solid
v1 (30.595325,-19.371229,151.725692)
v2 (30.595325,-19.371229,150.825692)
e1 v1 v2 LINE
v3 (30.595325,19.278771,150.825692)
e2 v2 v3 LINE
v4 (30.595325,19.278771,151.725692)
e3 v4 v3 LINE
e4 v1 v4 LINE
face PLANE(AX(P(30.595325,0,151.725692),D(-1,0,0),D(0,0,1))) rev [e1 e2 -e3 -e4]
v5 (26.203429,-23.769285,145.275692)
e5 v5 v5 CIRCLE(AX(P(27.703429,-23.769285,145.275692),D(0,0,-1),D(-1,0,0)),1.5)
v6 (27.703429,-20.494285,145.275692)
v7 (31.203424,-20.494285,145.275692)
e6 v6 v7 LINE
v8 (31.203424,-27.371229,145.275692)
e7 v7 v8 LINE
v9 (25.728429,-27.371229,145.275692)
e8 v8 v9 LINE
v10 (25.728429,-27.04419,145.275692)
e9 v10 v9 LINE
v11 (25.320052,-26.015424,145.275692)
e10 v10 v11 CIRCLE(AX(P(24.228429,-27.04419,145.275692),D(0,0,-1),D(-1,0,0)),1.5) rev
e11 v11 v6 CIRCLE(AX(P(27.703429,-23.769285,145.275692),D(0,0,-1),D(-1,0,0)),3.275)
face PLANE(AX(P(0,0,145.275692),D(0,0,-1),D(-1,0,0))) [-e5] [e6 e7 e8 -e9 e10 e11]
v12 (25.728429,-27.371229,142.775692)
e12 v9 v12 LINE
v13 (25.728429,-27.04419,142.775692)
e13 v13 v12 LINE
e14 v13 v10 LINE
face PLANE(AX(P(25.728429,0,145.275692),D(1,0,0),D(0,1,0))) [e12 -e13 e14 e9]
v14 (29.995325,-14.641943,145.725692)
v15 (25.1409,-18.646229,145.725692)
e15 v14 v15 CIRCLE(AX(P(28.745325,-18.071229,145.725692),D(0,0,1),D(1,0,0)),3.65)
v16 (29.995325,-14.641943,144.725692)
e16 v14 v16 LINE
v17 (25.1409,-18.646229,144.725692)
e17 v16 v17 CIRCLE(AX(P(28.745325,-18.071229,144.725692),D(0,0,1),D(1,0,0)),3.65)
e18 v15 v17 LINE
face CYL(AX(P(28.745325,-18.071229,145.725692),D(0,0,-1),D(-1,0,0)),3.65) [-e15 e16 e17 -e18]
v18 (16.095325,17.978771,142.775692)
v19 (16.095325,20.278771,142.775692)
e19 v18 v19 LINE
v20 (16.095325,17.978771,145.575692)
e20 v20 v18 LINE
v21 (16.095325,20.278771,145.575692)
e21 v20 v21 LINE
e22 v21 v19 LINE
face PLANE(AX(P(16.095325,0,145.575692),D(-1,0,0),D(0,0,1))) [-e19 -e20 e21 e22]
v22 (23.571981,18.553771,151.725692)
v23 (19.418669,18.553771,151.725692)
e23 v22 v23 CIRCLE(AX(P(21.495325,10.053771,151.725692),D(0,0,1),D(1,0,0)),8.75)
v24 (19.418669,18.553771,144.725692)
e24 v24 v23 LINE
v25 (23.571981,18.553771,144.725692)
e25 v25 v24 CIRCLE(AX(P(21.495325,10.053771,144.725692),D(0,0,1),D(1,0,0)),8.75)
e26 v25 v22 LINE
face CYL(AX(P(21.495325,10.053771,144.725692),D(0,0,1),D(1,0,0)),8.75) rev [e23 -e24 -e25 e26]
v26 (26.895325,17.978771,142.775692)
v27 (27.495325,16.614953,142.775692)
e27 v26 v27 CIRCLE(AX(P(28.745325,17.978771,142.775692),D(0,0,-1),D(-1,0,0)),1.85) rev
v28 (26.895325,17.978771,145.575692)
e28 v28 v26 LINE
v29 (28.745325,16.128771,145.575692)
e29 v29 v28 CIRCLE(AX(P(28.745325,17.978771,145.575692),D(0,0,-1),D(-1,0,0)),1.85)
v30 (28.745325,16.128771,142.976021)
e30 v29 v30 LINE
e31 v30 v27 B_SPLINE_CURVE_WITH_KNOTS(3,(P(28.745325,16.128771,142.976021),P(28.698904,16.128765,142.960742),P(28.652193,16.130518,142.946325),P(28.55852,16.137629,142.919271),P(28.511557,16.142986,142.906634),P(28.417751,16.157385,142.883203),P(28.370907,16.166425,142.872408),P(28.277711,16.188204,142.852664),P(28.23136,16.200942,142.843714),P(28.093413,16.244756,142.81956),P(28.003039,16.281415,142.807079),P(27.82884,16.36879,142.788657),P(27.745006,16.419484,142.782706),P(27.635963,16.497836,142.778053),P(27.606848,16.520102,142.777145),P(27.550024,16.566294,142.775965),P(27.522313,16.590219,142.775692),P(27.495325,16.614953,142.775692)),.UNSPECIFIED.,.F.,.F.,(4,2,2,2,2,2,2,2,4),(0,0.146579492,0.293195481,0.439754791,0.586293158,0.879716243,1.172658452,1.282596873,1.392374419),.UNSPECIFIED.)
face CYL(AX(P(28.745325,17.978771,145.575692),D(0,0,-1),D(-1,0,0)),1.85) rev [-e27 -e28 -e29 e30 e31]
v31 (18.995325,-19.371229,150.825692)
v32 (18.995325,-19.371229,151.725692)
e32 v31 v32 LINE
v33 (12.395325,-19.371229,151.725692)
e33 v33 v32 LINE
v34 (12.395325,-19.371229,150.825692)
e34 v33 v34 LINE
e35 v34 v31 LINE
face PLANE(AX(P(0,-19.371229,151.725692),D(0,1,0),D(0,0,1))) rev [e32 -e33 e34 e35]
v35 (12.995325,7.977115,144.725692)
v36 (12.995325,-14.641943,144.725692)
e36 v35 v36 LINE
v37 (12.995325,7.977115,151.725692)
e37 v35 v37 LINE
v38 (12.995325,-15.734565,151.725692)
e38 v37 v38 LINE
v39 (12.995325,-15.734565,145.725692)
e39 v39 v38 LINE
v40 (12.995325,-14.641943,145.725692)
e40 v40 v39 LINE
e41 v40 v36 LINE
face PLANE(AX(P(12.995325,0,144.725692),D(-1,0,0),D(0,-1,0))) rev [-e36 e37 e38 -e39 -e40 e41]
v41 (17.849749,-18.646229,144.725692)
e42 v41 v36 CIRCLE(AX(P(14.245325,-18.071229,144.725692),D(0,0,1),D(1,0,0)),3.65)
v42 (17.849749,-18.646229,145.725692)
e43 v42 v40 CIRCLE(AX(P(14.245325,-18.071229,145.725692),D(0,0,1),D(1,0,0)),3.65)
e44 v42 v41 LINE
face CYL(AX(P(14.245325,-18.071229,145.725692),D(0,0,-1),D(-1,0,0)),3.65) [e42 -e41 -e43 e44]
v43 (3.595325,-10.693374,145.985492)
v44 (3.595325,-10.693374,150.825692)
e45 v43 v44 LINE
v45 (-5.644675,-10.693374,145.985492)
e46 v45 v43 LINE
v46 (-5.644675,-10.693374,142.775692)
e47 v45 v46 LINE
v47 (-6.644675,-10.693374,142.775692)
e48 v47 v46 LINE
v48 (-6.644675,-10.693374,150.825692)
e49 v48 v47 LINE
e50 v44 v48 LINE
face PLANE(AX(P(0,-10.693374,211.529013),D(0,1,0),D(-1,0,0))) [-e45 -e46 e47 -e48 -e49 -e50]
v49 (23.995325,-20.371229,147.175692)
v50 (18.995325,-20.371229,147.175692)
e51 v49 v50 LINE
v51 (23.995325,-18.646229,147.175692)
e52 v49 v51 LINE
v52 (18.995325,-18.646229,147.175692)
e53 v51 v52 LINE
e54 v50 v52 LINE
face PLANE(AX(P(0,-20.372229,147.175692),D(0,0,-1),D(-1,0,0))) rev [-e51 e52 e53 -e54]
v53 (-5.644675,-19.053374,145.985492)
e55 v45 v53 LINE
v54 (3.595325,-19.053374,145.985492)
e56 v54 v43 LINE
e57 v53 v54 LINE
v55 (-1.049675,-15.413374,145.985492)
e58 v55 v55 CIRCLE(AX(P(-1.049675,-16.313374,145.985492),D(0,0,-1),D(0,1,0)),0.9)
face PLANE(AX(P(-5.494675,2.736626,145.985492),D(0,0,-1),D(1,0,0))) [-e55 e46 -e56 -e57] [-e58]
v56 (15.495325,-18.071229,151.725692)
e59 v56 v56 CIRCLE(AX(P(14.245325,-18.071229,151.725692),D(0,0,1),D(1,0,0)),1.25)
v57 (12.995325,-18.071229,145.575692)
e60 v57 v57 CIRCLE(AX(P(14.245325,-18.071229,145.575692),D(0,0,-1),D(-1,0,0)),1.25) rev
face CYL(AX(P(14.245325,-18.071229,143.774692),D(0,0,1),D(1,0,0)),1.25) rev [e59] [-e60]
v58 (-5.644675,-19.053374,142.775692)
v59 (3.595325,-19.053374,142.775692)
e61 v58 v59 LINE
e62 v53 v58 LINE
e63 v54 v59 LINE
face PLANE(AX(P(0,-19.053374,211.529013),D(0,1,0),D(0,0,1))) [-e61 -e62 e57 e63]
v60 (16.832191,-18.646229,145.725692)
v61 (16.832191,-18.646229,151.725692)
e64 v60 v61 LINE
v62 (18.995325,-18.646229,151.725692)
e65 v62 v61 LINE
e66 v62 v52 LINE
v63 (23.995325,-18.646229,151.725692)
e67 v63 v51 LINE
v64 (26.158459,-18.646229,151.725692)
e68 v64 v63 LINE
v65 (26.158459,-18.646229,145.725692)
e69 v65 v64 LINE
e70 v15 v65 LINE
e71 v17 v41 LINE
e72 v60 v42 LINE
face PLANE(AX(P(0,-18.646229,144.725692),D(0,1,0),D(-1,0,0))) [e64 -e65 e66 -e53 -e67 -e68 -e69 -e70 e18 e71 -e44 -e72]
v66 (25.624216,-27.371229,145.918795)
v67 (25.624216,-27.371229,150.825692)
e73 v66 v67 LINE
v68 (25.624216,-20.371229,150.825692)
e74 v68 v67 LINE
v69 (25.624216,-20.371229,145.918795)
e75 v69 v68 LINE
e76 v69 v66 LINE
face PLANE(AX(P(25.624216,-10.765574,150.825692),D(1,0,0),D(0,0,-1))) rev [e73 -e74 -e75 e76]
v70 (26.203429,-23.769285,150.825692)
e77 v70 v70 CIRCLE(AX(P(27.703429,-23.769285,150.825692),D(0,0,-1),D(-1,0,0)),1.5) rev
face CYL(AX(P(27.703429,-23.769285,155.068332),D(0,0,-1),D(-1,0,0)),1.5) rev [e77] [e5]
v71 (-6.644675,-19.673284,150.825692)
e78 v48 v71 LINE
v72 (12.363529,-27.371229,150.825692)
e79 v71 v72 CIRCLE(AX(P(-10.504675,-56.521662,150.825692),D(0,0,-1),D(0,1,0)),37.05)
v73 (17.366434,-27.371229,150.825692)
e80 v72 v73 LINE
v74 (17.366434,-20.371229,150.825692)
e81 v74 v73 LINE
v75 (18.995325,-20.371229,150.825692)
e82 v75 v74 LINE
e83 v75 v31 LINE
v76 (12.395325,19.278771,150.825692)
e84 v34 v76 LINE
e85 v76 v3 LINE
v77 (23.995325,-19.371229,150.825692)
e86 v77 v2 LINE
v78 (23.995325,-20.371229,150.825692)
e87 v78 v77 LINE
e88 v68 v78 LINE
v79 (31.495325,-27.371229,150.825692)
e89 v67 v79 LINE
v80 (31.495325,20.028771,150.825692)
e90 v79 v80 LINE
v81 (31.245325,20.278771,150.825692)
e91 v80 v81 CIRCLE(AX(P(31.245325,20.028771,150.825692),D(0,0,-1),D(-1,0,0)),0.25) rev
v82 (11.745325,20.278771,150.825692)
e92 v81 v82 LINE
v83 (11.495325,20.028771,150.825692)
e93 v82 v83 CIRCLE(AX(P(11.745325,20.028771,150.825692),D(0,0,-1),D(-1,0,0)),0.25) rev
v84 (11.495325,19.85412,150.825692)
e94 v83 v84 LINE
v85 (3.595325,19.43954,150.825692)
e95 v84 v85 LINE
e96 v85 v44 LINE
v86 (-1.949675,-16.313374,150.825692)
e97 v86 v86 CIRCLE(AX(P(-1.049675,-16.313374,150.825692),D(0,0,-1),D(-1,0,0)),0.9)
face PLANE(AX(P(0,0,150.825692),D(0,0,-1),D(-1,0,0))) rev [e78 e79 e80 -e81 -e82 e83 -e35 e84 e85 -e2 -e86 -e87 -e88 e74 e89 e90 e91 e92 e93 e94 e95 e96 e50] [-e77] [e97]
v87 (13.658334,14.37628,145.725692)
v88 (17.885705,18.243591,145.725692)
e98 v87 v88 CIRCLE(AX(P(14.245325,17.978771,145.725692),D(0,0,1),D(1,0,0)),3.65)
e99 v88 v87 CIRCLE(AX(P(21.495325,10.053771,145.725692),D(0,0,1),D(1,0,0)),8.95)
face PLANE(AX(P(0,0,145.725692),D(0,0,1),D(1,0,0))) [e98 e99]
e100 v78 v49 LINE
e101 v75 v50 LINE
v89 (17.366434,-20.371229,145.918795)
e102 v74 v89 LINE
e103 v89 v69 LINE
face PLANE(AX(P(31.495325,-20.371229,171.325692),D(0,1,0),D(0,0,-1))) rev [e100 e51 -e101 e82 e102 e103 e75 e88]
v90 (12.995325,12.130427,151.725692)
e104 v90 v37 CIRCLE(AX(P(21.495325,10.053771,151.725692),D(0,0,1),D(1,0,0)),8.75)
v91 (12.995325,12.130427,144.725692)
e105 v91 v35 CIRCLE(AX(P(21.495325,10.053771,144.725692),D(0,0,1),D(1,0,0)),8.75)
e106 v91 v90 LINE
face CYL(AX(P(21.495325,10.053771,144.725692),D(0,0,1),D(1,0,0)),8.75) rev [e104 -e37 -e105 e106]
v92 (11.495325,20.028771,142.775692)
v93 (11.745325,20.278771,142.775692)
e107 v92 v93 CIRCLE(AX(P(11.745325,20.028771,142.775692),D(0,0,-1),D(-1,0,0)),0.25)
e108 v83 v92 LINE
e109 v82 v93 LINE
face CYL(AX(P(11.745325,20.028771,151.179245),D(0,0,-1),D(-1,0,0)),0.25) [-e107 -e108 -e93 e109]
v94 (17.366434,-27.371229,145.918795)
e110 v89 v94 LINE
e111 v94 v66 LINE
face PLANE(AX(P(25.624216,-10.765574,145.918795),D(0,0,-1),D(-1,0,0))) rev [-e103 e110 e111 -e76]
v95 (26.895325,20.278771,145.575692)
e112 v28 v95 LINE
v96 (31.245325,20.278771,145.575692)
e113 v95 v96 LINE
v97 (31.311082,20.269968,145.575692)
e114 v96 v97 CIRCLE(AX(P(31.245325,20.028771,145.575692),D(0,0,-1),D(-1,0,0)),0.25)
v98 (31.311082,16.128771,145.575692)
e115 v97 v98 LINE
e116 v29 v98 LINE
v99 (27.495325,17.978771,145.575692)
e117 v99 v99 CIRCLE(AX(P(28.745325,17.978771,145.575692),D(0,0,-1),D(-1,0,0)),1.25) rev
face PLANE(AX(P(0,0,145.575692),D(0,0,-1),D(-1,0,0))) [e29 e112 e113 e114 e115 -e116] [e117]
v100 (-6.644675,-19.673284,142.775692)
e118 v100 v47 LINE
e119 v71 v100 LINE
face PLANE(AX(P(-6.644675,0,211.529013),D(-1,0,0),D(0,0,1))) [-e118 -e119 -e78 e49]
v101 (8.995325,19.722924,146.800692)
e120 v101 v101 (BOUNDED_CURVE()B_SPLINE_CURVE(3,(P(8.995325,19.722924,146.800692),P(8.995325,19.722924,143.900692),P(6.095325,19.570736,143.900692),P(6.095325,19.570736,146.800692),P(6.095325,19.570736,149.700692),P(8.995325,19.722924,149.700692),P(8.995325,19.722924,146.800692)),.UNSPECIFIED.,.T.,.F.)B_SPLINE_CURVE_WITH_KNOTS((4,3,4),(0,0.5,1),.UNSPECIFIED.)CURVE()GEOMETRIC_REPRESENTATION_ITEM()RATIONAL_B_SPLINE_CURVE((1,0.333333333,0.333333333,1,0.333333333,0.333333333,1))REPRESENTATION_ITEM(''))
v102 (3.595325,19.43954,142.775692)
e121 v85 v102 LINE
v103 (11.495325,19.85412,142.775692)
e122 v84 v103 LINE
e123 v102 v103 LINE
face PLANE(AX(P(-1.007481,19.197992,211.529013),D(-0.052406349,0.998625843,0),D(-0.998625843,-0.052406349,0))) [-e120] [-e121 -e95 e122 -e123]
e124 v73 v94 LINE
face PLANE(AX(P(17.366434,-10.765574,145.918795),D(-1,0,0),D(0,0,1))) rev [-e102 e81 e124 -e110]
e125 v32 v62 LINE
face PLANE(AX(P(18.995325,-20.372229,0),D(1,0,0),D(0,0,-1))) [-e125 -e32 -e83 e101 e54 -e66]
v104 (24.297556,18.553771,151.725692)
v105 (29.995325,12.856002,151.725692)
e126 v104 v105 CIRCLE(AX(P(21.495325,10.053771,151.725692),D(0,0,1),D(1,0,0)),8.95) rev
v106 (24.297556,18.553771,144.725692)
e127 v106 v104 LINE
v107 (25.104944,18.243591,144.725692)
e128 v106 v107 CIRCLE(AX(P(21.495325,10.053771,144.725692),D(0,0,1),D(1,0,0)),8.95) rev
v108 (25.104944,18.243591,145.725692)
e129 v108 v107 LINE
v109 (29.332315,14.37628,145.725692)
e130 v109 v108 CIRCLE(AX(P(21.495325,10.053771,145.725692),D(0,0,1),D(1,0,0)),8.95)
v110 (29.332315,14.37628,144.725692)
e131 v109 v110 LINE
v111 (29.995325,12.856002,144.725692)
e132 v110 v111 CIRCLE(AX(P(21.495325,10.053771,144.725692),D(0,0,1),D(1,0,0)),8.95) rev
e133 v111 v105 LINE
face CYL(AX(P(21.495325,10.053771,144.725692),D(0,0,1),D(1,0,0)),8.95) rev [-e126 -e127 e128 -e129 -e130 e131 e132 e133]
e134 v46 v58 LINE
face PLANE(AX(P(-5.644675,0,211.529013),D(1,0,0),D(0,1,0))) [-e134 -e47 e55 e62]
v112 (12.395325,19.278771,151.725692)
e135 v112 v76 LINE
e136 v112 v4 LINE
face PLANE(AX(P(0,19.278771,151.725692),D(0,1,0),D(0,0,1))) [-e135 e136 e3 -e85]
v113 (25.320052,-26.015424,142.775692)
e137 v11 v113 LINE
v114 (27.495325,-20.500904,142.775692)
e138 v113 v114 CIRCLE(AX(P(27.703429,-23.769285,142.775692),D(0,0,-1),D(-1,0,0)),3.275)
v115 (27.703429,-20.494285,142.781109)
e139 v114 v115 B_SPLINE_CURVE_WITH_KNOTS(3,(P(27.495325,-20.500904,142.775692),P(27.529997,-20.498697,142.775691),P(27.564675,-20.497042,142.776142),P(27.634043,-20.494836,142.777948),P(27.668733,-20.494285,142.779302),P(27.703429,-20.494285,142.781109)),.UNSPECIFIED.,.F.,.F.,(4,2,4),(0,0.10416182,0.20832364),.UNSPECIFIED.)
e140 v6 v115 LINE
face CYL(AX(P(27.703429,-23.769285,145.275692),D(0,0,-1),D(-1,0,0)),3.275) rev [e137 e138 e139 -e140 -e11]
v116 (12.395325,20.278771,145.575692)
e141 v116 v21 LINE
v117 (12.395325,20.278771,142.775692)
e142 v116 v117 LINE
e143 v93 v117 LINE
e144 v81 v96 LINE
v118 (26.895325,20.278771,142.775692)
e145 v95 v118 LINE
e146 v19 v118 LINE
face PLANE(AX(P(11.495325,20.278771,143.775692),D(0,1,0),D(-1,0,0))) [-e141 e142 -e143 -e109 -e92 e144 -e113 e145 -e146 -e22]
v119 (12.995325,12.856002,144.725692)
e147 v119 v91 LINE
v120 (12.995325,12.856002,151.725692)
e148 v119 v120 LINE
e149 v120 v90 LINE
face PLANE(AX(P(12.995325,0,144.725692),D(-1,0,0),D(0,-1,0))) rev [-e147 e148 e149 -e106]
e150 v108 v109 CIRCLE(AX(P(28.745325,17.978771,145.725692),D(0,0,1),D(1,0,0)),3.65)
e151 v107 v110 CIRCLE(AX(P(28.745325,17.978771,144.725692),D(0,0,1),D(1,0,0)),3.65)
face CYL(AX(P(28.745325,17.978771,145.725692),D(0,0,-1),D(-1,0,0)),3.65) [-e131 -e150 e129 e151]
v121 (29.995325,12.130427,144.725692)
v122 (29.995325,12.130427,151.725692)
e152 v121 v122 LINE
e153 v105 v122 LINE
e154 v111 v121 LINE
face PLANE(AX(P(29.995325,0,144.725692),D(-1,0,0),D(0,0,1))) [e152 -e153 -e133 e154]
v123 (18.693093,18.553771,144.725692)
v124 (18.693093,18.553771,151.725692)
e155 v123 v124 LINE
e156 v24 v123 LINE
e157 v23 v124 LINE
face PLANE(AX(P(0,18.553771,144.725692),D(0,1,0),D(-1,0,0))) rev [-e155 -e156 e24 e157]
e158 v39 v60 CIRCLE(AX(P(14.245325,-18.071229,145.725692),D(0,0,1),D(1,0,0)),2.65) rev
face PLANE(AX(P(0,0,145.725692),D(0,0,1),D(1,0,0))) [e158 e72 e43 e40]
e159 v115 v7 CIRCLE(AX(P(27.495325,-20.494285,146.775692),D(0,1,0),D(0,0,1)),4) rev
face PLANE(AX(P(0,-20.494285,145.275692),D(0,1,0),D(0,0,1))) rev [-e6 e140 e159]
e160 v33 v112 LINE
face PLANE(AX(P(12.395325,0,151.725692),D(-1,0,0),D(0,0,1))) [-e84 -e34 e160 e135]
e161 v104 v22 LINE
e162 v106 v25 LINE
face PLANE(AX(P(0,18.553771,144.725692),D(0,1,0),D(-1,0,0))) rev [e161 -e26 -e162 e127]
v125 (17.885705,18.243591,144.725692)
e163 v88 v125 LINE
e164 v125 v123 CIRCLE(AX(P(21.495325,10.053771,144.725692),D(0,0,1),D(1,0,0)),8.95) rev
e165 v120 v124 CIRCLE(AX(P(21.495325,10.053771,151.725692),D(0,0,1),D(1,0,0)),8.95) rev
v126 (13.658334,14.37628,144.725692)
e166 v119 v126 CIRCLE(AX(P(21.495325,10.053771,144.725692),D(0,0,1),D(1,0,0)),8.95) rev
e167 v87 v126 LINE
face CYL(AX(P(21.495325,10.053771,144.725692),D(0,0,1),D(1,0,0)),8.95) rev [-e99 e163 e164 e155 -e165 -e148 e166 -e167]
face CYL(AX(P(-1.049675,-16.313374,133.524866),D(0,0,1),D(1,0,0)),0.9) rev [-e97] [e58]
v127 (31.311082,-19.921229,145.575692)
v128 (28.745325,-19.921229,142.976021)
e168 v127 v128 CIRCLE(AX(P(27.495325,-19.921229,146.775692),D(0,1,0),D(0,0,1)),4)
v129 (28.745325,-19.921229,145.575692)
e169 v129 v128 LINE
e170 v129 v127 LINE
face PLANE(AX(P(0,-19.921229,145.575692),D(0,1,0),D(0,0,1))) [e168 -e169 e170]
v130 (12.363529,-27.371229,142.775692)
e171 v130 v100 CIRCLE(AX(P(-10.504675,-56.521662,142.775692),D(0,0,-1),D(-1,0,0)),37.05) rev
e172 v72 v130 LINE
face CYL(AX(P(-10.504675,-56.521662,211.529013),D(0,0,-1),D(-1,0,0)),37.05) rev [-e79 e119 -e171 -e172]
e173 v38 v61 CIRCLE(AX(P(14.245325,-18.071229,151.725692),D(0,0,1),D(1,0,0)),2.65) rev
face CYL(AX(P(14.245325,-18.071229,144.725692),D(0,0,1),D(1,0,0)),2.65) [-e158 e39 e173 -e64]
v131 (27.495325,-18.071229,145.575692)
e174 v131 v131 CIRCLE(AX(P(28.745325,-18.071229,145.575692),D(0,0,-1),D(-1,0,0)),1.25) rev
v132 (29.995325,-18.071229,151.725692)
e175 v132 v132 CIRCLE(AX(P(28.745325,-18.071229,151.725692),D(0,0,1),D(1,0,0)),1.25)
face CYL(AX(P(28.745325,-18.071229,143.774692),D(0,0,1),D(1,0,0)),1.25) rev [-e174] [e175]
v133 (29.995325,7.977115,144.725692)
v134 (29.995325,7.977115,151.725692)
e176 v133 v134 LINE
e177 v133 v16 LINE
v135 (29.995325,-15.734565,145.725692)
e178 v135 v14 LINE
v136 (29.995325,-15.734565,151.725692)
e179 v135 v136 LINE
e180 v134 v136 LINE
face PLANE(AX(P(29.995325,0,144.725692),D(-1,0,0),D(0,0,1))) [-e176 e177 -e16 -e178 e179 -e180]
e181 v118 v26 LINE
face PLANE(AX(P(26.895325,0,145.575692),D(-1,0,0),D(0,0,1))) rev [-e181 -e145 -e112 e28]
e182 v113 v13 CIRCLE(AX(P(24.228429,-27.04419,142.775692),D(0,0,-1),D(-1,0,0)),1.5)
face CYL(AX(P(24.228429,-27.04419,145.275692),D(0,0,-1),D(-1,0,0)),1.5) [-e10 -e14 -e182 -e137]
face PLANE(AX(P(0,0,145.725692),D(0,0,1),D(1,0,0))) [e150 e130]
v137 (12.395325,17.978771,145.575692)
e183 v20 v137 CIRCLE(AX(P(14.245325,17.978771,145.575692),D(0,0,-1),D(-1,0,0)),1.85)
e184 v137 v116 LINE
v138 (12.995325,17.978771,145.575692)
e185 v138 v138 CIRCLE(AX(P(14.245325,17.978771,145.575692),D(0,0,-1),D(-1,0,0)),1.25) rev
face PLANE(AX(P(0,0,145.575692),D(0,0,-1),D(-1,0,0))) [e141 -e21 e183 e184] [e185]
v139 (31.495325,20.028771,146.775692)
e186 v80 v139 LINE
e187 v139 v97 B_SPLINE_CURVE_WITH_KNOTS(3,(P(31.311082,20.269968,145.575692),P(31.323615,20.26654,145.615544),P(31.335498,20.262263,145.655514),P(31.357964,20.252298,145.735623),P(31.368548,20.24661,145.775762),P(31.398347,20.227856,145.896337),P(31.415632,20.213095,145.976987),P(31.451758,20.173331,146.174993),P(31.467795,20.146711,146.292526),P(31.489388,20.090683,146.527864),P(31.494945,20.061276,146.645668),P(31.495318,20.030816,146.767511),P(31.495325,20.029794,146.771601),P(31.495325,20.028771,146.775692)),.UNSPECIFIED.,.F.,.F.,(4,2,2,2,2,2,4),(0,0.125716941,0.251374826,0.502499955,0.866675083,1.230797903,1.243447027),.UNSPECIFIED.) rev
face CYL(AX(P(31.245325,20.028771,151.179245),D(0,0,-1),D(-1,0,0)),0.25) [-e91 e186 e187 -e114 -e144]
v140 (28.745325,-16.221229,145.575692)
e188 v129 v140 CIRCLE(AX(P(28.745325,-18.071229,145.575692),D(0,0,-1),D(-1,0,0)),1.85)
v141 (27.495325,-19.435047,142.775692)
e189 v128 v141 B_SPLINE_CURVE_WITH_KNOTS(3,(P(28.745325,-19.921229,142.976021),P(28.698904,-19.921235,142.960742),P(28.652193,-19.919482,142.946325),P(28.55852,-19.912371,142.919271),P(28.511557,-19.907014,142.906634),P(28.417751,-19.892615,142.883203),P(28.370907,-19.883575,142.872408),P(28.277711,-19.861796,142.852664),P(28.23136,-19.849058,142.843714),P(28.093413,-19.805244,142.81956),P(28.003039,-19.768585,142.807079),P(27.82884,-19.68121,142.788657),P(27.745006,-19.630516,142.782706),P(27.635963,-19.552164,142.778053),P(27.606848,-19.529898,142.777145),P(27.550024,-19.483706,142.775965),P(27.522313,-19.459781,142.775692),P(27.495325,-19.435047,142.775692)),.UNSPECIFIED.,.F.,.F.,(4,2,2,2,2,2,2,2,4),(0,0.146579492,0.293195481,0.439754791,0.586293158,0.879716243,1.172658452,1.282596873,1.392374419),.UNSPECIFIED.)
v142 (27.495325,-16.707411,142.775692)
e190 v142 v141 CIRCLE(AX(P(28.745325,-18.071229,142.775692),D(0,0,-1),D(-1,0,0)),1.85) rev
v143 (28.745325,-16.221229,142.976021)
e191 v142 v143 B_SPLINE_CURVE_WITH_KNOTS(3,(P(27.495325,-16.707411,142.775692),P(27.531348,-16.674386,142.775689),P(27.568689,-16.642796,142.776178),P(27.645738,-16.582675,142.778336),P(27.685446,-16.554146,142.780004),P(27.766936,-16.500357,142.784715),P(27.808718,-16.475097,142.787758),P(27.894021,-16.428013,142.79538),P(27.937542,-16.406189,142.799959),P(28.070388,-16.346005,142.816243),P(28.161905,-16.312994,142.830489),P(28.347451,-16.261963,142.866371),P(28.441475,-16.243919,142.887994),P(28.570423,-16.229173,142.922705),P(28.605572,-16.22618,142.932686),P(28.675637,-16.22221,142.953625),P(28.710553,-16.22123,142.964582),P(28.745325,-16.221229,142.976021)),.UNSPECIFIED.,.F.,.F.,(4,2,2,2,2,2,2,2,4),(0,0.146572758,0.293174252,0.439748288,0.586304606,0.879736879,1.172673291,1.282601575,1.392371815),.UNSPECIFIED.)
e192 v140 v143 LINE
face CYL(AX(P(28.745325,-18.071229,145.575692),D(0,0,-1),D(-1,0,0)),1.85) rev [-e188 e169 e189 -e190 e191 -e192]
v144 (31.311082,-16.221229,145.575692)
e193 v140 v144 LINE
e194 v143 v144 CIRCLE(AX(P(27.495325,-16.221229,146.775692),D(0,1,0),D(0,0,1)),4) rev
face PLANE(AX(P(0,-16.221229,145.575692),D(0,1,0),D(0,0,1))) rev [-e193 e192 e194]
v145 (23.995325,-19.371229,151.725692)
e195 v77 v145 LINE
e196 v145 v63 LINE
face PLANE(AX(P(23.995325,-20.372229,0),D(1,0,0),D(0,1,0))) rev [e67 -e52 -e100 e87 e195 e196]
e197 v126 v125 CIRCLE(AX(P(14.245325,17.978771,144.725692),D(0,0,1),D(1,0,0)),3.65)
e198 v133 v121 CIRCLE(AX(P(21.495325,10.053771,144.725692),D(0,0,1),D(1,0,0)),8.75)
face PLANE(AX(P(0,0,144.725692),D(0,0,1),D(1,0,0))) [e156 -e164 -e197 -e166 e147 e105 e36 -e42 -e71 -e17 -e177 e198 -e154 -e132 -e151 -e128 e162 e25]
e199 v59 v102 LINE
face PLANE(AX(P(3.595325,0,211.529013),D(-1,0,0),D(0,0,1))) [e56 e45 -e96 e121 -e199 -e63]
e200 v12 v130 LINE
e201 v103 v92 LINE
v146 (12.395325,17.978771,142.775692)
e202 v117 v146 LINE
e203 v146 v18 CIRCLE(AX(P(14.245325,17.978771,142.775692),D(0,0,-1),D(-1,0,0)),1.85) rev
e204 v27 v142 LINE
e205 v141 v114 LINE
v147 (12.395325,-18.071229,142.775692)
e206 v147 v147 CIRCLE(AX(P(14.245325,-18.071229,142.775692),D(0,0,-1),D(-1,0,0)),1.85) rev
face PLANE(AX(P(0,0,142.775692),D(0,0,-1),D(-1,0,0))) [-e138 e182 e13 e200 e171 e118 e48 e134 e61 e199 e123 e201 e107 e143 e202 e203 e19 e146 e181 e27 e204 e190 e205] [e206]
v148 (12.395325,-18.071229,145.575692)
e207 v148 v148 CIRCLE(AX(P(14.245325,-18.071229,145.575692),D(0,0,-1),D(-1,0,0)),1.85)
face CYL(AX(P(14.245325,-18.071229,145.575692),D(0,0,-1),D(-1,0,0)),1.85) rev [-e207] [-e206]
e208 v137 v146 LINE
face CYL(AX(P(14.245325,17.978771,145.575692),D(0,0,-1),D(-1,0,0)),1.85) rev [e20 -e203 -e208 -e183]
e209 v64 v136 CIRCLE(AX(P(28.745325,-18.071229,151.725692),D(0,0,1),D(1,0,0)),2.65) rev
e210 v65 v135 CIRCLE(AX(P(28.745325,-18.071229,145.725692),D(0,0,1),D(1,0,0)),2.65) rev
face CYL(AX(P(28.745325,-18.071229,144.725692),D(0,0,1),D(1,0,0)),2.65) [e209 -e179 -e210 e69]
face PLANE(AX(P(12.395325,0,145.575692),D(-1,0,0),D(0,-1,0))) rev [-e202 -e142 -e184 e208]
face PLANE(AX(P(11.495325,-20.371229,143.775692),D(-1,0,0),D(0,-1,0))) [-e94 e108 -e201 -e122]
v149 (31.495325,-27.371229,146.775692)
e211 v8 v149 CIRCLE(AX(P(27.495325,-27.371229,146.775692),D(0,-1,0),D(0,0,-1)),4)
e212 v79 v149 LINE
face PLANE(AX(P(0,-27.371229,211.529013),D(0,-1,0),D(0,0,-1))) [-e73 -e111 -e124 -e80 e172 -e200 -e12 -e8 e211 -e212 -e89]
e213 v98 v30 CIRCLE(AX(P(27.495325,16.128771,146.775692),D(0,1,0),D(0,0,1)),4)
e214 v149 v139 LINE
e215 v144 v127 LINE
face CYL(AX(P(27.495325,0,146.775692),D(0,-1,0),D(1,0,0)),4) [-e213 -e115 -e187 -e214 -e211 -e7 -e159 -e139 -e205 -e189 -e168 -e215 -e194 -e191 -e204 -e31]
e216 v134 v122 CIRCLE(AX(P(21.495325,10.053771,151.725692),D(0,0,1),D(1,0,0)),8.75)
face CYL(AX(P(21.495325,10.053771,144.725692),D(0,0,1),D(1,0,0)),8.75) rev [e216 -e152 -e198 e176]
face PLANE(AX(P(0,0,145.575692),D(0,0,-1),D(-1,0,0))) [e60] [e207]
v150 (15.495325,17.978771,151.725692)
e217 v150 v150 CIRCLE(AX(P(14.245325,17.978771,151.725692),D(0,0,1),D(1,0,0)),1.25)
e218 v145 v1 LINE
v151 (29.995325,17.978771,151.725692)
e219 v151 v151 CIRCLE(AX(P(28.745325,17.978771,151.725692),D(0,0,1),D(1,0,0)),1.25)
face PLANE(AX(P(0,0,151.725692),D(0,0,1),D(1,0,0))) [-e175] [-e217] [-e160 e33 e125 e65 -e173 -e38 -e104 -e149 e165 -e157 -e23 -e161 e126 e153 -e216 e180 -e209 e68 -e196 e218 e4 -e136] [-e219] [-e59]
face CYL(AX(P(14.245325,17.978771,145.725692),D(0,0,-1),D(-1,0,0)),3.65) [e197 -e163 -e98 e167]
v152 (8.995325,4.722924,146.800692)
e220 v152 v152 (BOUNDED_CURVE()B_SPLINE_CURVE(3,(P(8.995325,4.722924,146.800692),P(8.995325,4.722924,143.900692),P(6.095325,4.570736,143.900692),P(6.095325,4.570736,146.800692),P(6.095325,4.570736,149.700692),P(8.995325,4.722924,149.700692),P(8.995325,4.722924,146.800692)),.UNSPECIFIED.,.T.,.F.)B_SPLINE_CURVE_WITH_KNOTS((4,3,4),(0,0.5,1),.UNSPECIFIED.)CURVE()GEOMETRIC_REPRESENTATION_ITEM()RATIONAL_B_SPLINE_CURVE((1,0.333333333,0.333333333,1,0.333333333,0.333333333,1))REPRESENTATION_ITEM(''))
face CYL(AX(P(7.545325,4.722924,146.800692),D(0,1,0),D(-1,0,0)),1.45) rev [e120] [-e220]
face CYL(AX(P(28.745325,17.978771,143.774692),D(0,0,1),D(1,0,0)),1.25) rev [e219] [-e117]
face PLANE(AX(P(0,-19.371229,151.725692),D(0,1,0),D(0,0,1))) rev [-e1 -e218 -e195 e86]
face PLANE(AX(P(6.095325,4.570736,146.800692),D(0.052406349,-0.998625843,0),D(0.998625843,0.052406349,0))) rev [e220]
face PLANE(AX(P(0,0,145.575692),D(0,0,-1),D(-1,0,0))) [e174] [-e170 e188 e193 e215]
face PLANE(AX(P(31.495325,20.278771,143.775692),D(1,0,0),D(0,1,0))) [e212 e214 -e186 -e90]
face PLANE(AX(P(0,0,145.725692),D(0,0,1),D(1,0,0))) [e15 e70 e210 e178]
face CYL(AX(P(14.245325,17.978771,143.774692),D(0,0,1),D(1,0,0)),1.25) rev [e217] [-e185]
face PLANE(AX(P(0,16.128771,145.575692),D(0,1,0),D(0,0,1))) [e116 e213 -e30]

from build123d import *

# Parameters (mm, degrees)
SKETCH2_W                 = 20
SKETCH2_H                 = 40.65
BOSS_EXTRUDE2_DEPTH       = 7.05
SKETCH3_W                 = 18.2
SKETCH3_H                 = 38.65
BOSS_EXTRUDE3_DEPTH       = 0.9
CUT_EXTRUDE1_DEPTH        = 7
CUT_EXTRUDE4_REACH        = 40.342
SKETCH4_4_R               = 1.25
BOSS_EXTRUDE4_START       = 1
BOSS_EXTRUDE4_DEPTH       = 1
CUT_EXTRUDE5_START        = -1.8
SKETCH5_R                 = 1.85
SKETCH5_R_2               = 1.25
CUT_EXTRUDE5_DEPTH        = 1.8
CUT_EXTRUDE6_DEPTH        = 7.05
CUT_EXTRUDE7_REACH        = 161.774
SKETCH8_W                 = 5
SKETCH8_H                 = 4.55
SKETCH9_R                 = 1.85
BOSS_EXTRUDE5_DEPTH       = 1
BOSS_EXTRUDE7_DEPTH       = 8.05
CUT_EXTRUDE8_START        = -7
SKETCH12_W                = 8.257782218
SKETCH12_H                = 4.906896877
CUT_EXTRUDE8_DEPTH        = 7
CUT_EXTRUDE9_DEPTH        = 2.5
CUT_EXTRUDE10_START       = -8.05
SKETCH13_3_R              = 1.499999995
CUT_EXTRUDE10_DEPTH       = 5.55
CUT_EXTRUDE11_START       = -15.708035038
CUT_EXTRUDE11_OUTLINE_R   = 1.45
CUT_EXTRUDE11_DEPTH       = 15.283383801
CUT_EXTRUDE11_START_2     = -4.245021448
CUT_EXTRUDE11_2_OUTLINE_W = 6
CUT_EXTRUDE11_2_OUTLINE_H = 6
CUT_EXTRUDE11_2_DEPTH     = 1.245021448
FILLET1_R                 = 4
FILLET2_R                 = 1.5
BOSS_EXTRUDE8_START       = -8.05
SKETCH11_4_W              = 9.24
SKETCH11_4_H              = 8.36
SKETCH11_4_R              = 0.9
BOSS_EXTRUDE8_DEPTH       = 4.8402


with BuildPart() as part:
    # Sketch2 → Boss-Extrude2 (new body)
    with BuildSketch(Plane.XY.offset(150.825691762)):
        with Locations((21.495324698, -0.04622899)):
            Rectangle(SKETCH2_W, SKETCH2_H)
    extrude(amount=-BOSS_EXTRUDE2_DEPTH)

    # Sketch3 → Boss-Extrude3 (add)
    with BuildSketch(Plane.XY.offset(150.825691762)):
        with Locations((21.495324698, -0.04622899)):
            Rectangle(SKETCH3_W, SKETCH3_H)
    extrude(amount=BOSS_EXTRUDE3_DEPTH)

    # Sketch4 → Cut-Extrude1 (cut)
    with BuildSketch(Plane.XY.offset(151.725691762)):
        with BuildLine():
            Line((29.995324698, -15.734564701), (29.995324698, 7.977115044))
            ThreePointArc((29.995324698, 7.977115044), (21.495324698, 1.30377101), (12.995324698, 7.977115044))
            Line((12.995324698, 7.977115044), (12.995324698, -15.734564701))
            ThreePointArc((12.995324698, -15.734564701), (15.847276575, -15.960245764), (16.832190562, -18.64622899))
            Line((16.832190562, -18.64622899), (26.158458833, -18.64622899))
            ThreePointArc((26.158458833, -18.64622899), (27.14337282, -15.960245764), (29.995324698, -15.734564701))
        make_face()
        with BuildLine():
            Line((29.995324698, 7.977115044), (29.995324698, 12.130426976))
            ThreePointArc((29.995324698, 12.130426976), (27.682509033, 16.240955345), (23.571980663, 18.55377101))
            Line((23.571980663, 18.55377101), (19.418668732, 18.55377101))
            ThreePointArc((19.418668732, 18.55377101), (15.308140362, 16.240955345), (12.995324698, 12.130426976))
            Line((12.995324698, 12.130426976), (12.995324698, 7.977115044))
            ThreePointArc((12.995324698, 7.977115044), (21.495324698, 1.30377101), (29.995324698, 7.977115044))
        make_face()
        with BuildLine():
            ThreePointArc((12.995324698, 12.130426976), (15.308140362, 16.240955345), (19.418668732, 18.55377101))
            Line((19.418668732, 18.55377101), (18.693093444, 18.55377101))
            ThreePointArc((18.693093444, 18.55377101), (15.166719006, 16.382376702), (12.995324698, 12.856002264))
            Line((12.995324698, 12.856002264), (12.995324698, 12.130426976))
        make_face()
        with BuildLine():
            Line((19.418668732, 18.55377101), (23.571980663, 18.55377101))
            ThreePointArc((23.571980663, 18.55377101), (21.495324698, 18.80377101), (19.418668732, 18.55377101))
        make_face()
        with BuildLine():
            Line((29.995324698, 12.130426976), (29.995324698, 12.856002264))
            ThreePointArc((29.995324698, 12.856002264), (27.823930389, 16.382376702), (24.297555951, 18.55377101))
            Line((24.297555951, 18.55377101), (23.571980663, 18.55377101))
            ThreePointArc((23.571980663, 18.55377101), (27.682509033, 16.240955345), (29.995324698, 12.130426976))
        make_face()
        with BuildLine():
            ThreePointArc((12.995324698, 12.130426976), (12.745324698, 10.05377101), (12.995324698, 7.977115044))
            Line((12.995324698, 7.977115044), (12.995324698, 12.130426976))
        make_face()
        with BuildLine():
            ThreePointArc((30.245324698, 10.05377101), (30.182599875, 11.099596043), (29.995324698, 12.130426976))
            Line((29.995324698, 12.130426976), (29.995324698, 7.977115044))
            ThreePointArc((29.995324698, 7.977115044), (30.182599875, 9.007945977), (30.245324698, 10.05377101))
        make_face()
    extrude(amount=-CUT_EXTRUDE1_DEPTH, mode=Mode.SUBTRACT)

    # Sketch4<4> → Cut-Extrude4 (cut, up to next)
    with BuildSketch(Plane.XY.offset(151.725691762), mode=Mode.PRIVATE) as cut_extrude4_sk1:
        with BuildLine():
            ThreePointArc((29.855223342, -18.64622899), (29.959794398, -18.367140037), (29.995324698, -18.07122899))
            ThreePointArc((29.995324698, -18.07122899), (28.449413651, -16.85675929), (27.635426054, -18.64622899))
            Line((27.635426054, -18.64622899), (29.855223342, -18.64622899))
        make_face()
    cut_extrude4_tool1 = extrude(cut_extrude4_sk1.sketch, amount=-CUT_EXTRUDE4_REACH, mode=Mode.PRIVATE) & part.part
    # Sketch4<4> → Cut-Extrude4 (cut, up to next)
    with BuildSketch(Plane.XY.offset(151.725691762), mode=Mode.PRIVATE) as cut_extrude4_sk2:
        with BuildLine():
            Line((29.855223342, -18.64622899), (27.635426054, -18.64622899))
            ThreePointArc((27.635426054, -18.64622899), (28.745324698, -19.32122899), (29.855223342, -18.64622899))
        make_face()
    cut_extrude4_tool2 = extrude(cut_extrude4_sk2.sketch, amount=-CUT_EXTRUDE4_REACH, mode=Mode.PRIVATE) & part.part
    # Sketch4<4> → Cut-Extrude4 (cut, up to next)
    with BuildSketch(Plane.XY.offset(151.725691762), mode=Mode.PRIVATE) as cut_extrude4_sk3:
        with BuildLine():
            ThreePointArc((29.855223342, -18.64622899), (29.959794398, -18.367140037), (29.995324698, -18.07122899))
            ThreePointArc((29.995324698, -18.07122899), (28.449413651, -16.85675929), (27.635426054, -18.64622899))
            Line((27.635426054, -18.64622899), (29.855223342, -18.64622899))
        make_face()
    cut_extrude4_tool3 = extrude(cut_extrude4_sk3.sketch, amount=-CUT_EXTRUDE4_REACH, mode=Mode.PRIVATE) & part.part
    # Sketch4<4> → Cut-Extrude4 (cut, up to next)
    with BuildSketch(Plane.XY.offset(151.725691762), mode=Mode.PRIVATE) as cut_extrude4_sk4:
        with BuildLine():
            Line((29.855223342, -18.64622899), (27.635426054, -18.64622899))
            ThreePointArc((27.635426054, -18.64622899), (28.745324698, -19.32122899), (29.855223342, -18.64622899))
        make_face()
    cut_extrude4_tool4 = extrude(cut_extrude4_sk4.sketch, amount=-CUT_EXTRUDE4_REACH, mode=Mode.PRIVATE) & part.part
    # Sketch4<4> → Cut-Extrude4 (cut, up to next)
    with BuildSketch(Plane.XY.offset(151.725691762), mode=Mode.PRIVATE) as cut_extrude4_sk5:
        with Locations((14.245324698, -18.07122899)):
            Circle(SKETCH4_4_R)
    cut_extrude4_tool5 = extrude(cut_extrude4_sk5.sketch, amount=-CUT_EXTRUDE4_REACH, mode=Mode.PRIVATE) & part.part
    # Sketch4<4> → Cut-Extrude4 (cut, up to next)
    with BuildSketch(Plane.XY.offset(151.725691762), mode=Mode.PRIVATE) as cut_extrude4_sk6:
        with Locations((28.745324698, 17.97877101)):
            Circle(SKETCH4_4_R)
    cut_extrude4_tool6 = extrude(cut_extrude4_sk6.sketch, amount=-CUT_EXTRUDE4_REACH, mode=Mode.PRIVATE) & part.part
    # Sketch4<4> → Cut-Extrude4 (cut, up to next)
    with BuildSketch(Plane.XY.offset(151.725691762), mode=Mode.PRIVATE) as cut_extrude4_sk7:
        with Locations((14.245324698, 17.97877101)):
            Circle(SKETCH4_4_R)
    cut_extrude4_tool7 = extrude(cut_extrude4_sk7.sketch, amount=-CUT_EXTRUDE4_REACH, mode=Mode.PRIVATE) & part.part
    add(cut_extrude4_tool1.solids().sort_by_distance((28.745325, -17.833823, 151.725692))[0], mode=Mode.SUBTRACT)
    add(cut_extrude4_tool2.solids().sort_by_distance((28.745325, -18.923652, 151.725692))[0], mode=Mode.SUBTRACT)
    add(cut_extrude4_tool3.solids().sort_by_distance((28.745325, -17.833823, 151.725692))[0], mode=Mode.SUBTRACT)
    add(cut_extrude4_tool4.solids().sort_by_distance((28.745325, -18.923652, 151.725692))[0], mode=Mode.SUBTRACT)
    add(cut_extrude4_tool5.solids().sort_by_distance((14.245325, -18.071229, 151.725692))[0], mode=Mode.SUBTRACT)
    add(cut_extrude4_tool6.solids().sort_by_distance((28.745325, 17.978771, 151.725692))[0], mode=Mode.SUBTRACT)
    add(cut_extrude4_tool7.solids().sort_by_distance((14.245325, 17.978771, 151.725692))[0], mode=Mode.SUBTRACT)

    # Sketch6 → Boss-Extrude4 (add)
    with BuildSketch(Plane.XY.offset(144.725691762).offset(BOSS_EXTRUDE4_START)):
        with BuildLine():
            ThreePointArc((13.658334388, 14.376279875), (16.709025437, 15.285691236), (17.885705242, 18.243590751))
            ThreePointArc((17.885705242, 18.243590751), (15.454195488, 16.657350181), (13.658334388, 14.376279875))
        make_face()
        with BuildLine():
            ThreePointArc((17.849749062, -18.64622899), (16.56791041, -15.255541577), (12.995324698, -14.64194335))
            Line((12.995324698, -14.64194335), (12.995324698, -15.734564701))
            ThreePointArc((12.995324698, -15.734564701), (15.847276575, -15.960245764), (16.832190562, -18.64622899))
            Line((16.832190562, -18.64622899), (17.849749062, -18.64622899))
        make_face()
        with BuildLine():
            ThreePointArc((29.332315007, 14.376279875), (27.536453908, 16.657350181), (25.104944154, 18.243590751))
            ThreePointArc((25.104944154, 18.243590751), (26.281623958, 15.285691236), (29.332315007, 14.376279875))
        make_face()
        with BuildLine():
            ThreePointArc((29.995324698, -14.64194335), (26.422738985, -15.255541577), (25.140900333, -18.64622899))
            Line((25.140900333, -18.64622899), (26.158458833, -18.64622899))
            ThreePointArc((26.158458833, -18.64622899), (27.14337282, -15.960245764), (29.995324698, -15.734564701))
            Line((29.995324698, -15.734564701), (29.995324698, -14.64194335))
        make_face()
    extrude(amount=-BOSS_EXTRUDE4_DEPTH)

    # Sketch5 → Cut-Extrude5 (cut)
    # profile 1 of 7: a face of its own
    with BuildSketch(Plane(origin=(0, 0, 143.775691762), x_dir=(-1, 0, 0), z_dir=(0, 0, -1)).offset(CUT_EXTRUDE5_START)):
        with BuildLine():
            Line((-28.745324698, -16.22122899), (-31.495324698, -16.22122899))
            Line((-31.495324698, -16.22122899), (-31.495324698, -19.92122899))
            Line((-31.495324698, -19.92122899), (-28.745324698, -19.92122899))
            ThreePointArc((-28.745324698, -19.92122899), (-30.595324698, -18.07122899), (-28.745324698, -16.22122899))
        make_face()
    # profile 2 of 7: a face of its own
    with BuildSketch(Plane(origin=(0, 0, 143.775691762), x_dir=(-1, 0, 0), z_dir=(0, 0, -1)).offset(CUT_EXTRUDE5_START)):
        with Locations((-28.745324698, -18.07122899)):
            Circle(SKETCH5_R)
        with Locations(Location((-28.745324698, -18.07122899, 0), (0, 0, 180))):
            Circle(SKETCH5_R_2, mode=Mode.SUBTRACT)
    # profile 3 of 7: a face of its own
    with BuildSketch(Plane(origin=(0, 0, 143.775691762), x_dir=(-1, 0, 0), z_dir=(0, 0, -1)).offset(CUT_EXTRUDE5_START)):
        with Locations((-14.245324698, -18.07122899)):
            Circle(SKETCH5_R)
        with Locations(Location((-14.245324698, -18.07122899, 0), (0, 0, 180))):
            Circle(SKETCH5_R_2, mode=Mode.SUBTRACT)
    # profile 4 of 7: a face of its own
    with BuildSketch(Plane(origin=(0, 0, 143.775691762), x_dir=(-1, 0, 0), z_dir=(0, 0, -1)).offset(CUT_EXTRUDE5_START)):
        with BuildLine():
            Line((-12.395324698, 20.27877101), (-16.095324698, 20.27877101))
            Line((-16.095324698, 20.27877101), (-16.095324698, 17.97877101))
            ThreePointArc((-16.095324698, 17.97877101), (-14.245324698, 19.82877101), (-12.395324698, 17.97877101))
            Line((-12.395324698, 17.97877101), (-12.395324698, 20.27877101))
        make_face()
    # profile 5 of 7: a face of its own
    with BuildSketch(Plane(origin=(0, 0, 143.775691762), x_dir=(-1, 0, 0), z_dir=(0, 0, -1)).offset(CUT_EXTRUDE5_START)):
        with Locations((-14.245324698, 17.97877101)):
            Circle(SKETCH5_R)
        with Locations(Location((-14.245324698, 17.97877101, 0), (0, 0, 180))):
            Circle(SKETCH5_R_2, mode=Mode.SUBTRACT)
    # profile 6 of 7: a face of its own
    with BuildSketch(Plane(origin=(0, 0, 143.775691762), x_dir=(-1, 0, 0), z_dir=(0, 0, -1)).offset(CUT_EXTRUDE5_START)):
        with BuildLine():
            Line((-31.495324698, 16.12877101), (-28.745324698, 16.12877101))
            ThreePointArc((-28.745324698, 16.12877101), (-30.053472243, 19.286918555), (-26.895324698, 17.97877101))
            Line((-26.895324698, 17.97877101), (-26.895324698, 20.27877101))
            Line((-26.895324698, 20.27877101), (-31.495324698, 20.27877101))
            Line((-31.495324698, 20.27877101), (-31.495324698, 16.12877101))
        make_face()
    # profile 7 of 7: a face of its own
    with BuildSketch(Plane(origin=(0, 0, 143.775691762), x_dir=(-1, 0, 0), z_dir=(0, 0, -1)).offset(CUT_EXTRUDE5_START)):
        with Locations((-28.745324698, 17.97877101)):
            Circle(SKETCH5_R)
        with Locations(Location((-28.745324698, 17.97877101, 0), (0, 0, 180))):
            Circle(SKETCH5_R_2, mode=Mode.SUBTRACT)
    extrude(amount=CUT_EXTRUDE5_DEPTH, mode=Mode.SUBTRACT)

    # Sketch7 → Cut-Extrude6 (cut)
    with BuildSketch(Plane(origin=(0, 0, 143.775691762), x_dir=(-1, 0, 0), z_dir=(0, 0, -1))):
        with BuildLine():
            Line((-31.495324698, -20.37122899), (-31.245324698, -20.37122899))
            ThreePointArc((-31.245324698, -20.37122899), (-31.422101393, -20.298005685), (-31.495324698, -20.12122899))
            Line((-31.495324698, -20.12122899), (-31.495324698, -20.37122899))
        make_face()
        with BuildLine():
            Line((-11.745324698, -20.37122899), (-11.495324698, -20.37122899))
            Line((-11.495324698, -20.37122899), (-11.495324698, -20.12122899))
            ThreePointArc((-11.495324698, -20.12122899), (-11.568548002, -20.298005685), (-11.745324698, -20.37122899))
        make_face()
        with BuildLine():
            ThreePointArc((-11.745324698, 20.27877101), (-11.568548002, 20.205547706), (-11.495324698, 20.02877101))
            Line((-11.495324698, 20.02877101), (-11.495324698, 20.27877101))
            Line((-11.495324698, 20.27877101), (-11.745324698, 20.27877101))
        make_face()
        with BuildLine():
            ThreePointArc((-31.245324698, 20.27877101), (-31.422101393, 20.205547706), (-31.495324698, 20.02877101))
            Line((-31.495324698, 20.02877101), (-31.495324698, 20.27877101))
            Line((-31.495324698, 20.27877101), (-31.245324698, 20.27877101))
        make_face()
    extrude(amount=-CUT_EXTRUDE6_DEPTH, mode=Mode.SUBTRACT)

    # Sketch8 → Cut-Extrude7 (cut, up to next)
    with BuildSketch(Plane(origin=(0, -18.64622899, 0), x_dir=(1, 0, 0), z_dir=(0, 1, 0)), mode=Mode.PRIVATE) as cut_extrude7_sk1:
        with Locations((21.495324698, -149.450691762)):
            Rectangle(SKETCH8_W, SKETCH8_H)
    cut_extrude7_tool1 = extrude(cut_extrude7_sk1.sketch, amount=-CUT_EXTRUDE7_REACH, mode=Mode.PRIVATE) & part.part
    add(cut_extrude7_tool1.solids().sort_by_distance((21.495325, -18.646229, 149.450692))[0], mode=Mode.SUBTRACT)

    # Sketch9 → Boss-Extrude5 (add)
    with BuildSketch(Plane(origin=(0, 0, 143.775691762), x_dir=(-1, 0, 0), z_dir=(0, 0, -1))):
        with BuildLine():
            ThreePointArc((-11.745324698, -20.37122899), (-11.568548002, -20.298005685), (-11.495324698, -20.12122899))
            Line((-11.495324698, -20.12122899), (-11.495324698, 20.02877101))
            ThreePointArc((-11.495324698, 20.02877101), (-11.568548002, 20.205547706), (-11.745324698, 20.27877101))
            Line((-11.745324698, 20.27877101), (-12.395324698, 20.27877101))
            Line((-12.395324698, 20.27877101), (-12.395324698, 17.97877101))
            ThreePointArc((-12.395324698, 17.97877101), (-14.245324698, 16.12877101), (-16.095324698, 17.97877101))
            Line((-16.095324698, 17.97877101), (-16.095324698, 20.27877101))
            Line((-16.095324698, 20.27877101), (-26.895324698, 20.27877101))
            Line((-26.895324698, 20.27877101), (-26.895324698, 17.97877101))
            ThreePointArc((-26.895324698, 17.97877101), (-27.437177152, 16.670623465), (-28.745324698, 16.12877101))
            Line((-28.745324698, 16.12877101), (-31.495324698, 16.12877101))
            Line((-31.495324698, 16.12877101), (-31.495324698, -16.22122899))
            Line((-31.495324698, -16.22122899), (-28.745324698, -16.22122899))
            ThreePointArc((-28.745324698, -16.22122899), (-26.895324698, -18.07122899), (-28.745324698, -19.92122899))
            Line((-28.745324698, -19.92122899), (-31.495324698, -19.92122899))
            Line((-31.495324698, -19.92122899), (-31.495324698, -20.12122899))
            ThreePointArc((-31.495324698, -20.12122899), (-31.422101393, -20.298005685), (-31.245324698, -20.37122899))
            Line((-31.245324698, -20.37122899), (-11.745324698, -20.37122899))
        make_face()
        with Locations((-14.245324698, -18.07122899)):
            Circle(SKETCH9_R, mode=Mode.SUBTRACT)
    extrude(amount=BOSS_EXTRUDE5_DEPTH)

    # Sketch11 → Boss-Extrude7 (add)
    with BuildSketch(Plane(origin=(0, 0, 142.775691762), x_dir=(-1, 0, 0), z_dir=(0, 0, -1))):
        with BuildLine():
            ThreePointArc((-12.363529237, -27.37122899), (-11.931858956, -27.037692555), (-11.495324698, -26.710547897))
            Line((-11.495324698, -26.710547897), (-11.495324698, -20.12122899))
            ThreePointArc((-11.495324698, -20.12122899), (-11.568548002, -20.298005685), (-11.745324698, -20.37122899))
            Line((-11.745324698, -20.37122899), (-31.245324698, -20.37122899))
            ThreePointArc((-31.245324698, -20.37122899), (-31.422101393, -20.298005685), (-31.495324698, -20.12122899))
            Line((-31.495324698, -20.12122899), (-31.495324698, -27.37122899))
            Line((-31.495324698, -27.37122899), (-12.363529237, -27.37122899))
        make_face()
        with BuildLine():
            ThreePointArc((-11.495324698, -26.710547897), (-7.682005328, -24.242455478), (-3.595324698, -22.259546951))
            Line((-3.595324698, -22.259546951), (-3.595324698, -19.053373874))
            Line((-3.595324698, -19.053373874), (-3.595324698, -10.693373874))
            Line((-3.595324698, -10.693373874), (-3.595324698, 19.439539914))
            Line((-3.595324698, 19.439539914), (-11.495324698, 19.854119773))
            Line((-11.495324698, 19.854119773), (-11.495324698, -20.12122899))
            Line((-11.495324698, -20.12122899), (-11.495324698, -26.710547897))
        make_face()
        with BuildLine():
            ThreePointArc((-3.595324698, -22.259546951), (1.432046771, -20.599663997), (6.644675302, -19.673284428))
            Line((6.644675302, -19.673284428), (6.644675302, -10.693373874))
            Line((6.644675302, -10.693373874), (5.644675302, -10.693373874))
            Line((5.644675302, -10.693373874), (5.644675302, -19.053373874))
            Line((5.644675302, -19.053373874), (-3.595324698, -19.053373874))
            Line((-3.595324698, -19.053373874), (-3.595324698, -22.259546951))
        make_face()
    extrude(amount=-BOSS_EXTRUDE7_DEPTH)

    # Sketch12 → Cut-Extrude8 (cut)
    with BuildSketch(Plane.XZ.offset(27.37122899).offset(CUT_EXTRUDE8_START)):
        with Locations((21.495324698, 148.372243324)):
            Rectangle(SKETCH12_W, SKETCH12_H)
    extrude(amount=CUT_EXTRUDE8_DEPTH, mode=Mode.SUBTRACT)

    # Sketch13 → Cut-Extrude9 (cut)
    with BuildSketch(Plane(origin=(0, 0, 142.775691762), x_dir=(-1, 0, 0), z_dir=(0, 0, -1))):
        with BuildLine():
            Line((-25.728428709, -27.37122899), (-25.728428709, -26.381755197))
            ThreePointArc((-25.728428712, -26.381755192), (-24.598475851, -22.727703268), (-27.703428709, -20.494285106))
            Line((-27.703428709, -20.494285101), (-31.495324698, -20.494285101))
            Line((-31.495324698, -20.494285101), (-31.495324698, -27.37122899))
            Line((-31.495324698, -27.37122899), (-25.728428709, -27.37122899))
        make_face()
    extrude(amount=-CUT_EXTRUDE9_DEPTH, mode=Mode.SUBTRACT)

    # Sketch13<3> → Cut-Extrude10 (cut)
    with BuildSketch(Plane(origin=(0, 0, 142.775691762), x_dir=(-1, 0, 0), z_dir=(0, 0, -1)).offset(CUT_EXTRUDE10_START)):
        with Locations((-27.703428709, -23.769285101)):
            Circle(SKETCH13_3_R)
    extrude(amount=CUT_EXTRUDE10_DEPTH, mode=Mode.SUBTRACT)

    # Cut-Extrude11: read off the stored shape, not the designer's step
    # Cut-Extrude11 outline → Cut-Extrude11 (cut)
    with BuildSketch(Plane(origin=(0, 20.27877101, 0), x_dir=(1, 0, 0), z_dir=(0, 1, 0)).offset(CUT_EXTRUDE11_START)):
        with Locations((7.545324698, -146.800691762)):
            Circle(CUT_EXTRUDE11_OUTLINE_R)
    extrude(amount=CUT_EXTRUDE11_DEPTH, mode=Mode.SUBTRACT)

    # Cut-Extrude11 2 outline → Cut-Extrude11 2 (add)
    with BuildSketch(Plane(origin=(0, 0, 0), x_dir=(0.9986258431157958, 0.052406349436551286, 0), z_dir=(0.052406349436551286, -0.9986258431157958, 0)).offset(CUT_EXTRUDE11_START_2)):
        with Locations((8, 147)):
            Rectangle(CUT_EXTRUDE11_2_OUTLINE_W, CUT_EXTRUDE11_2_OUTLINE_H)
    extrude(amount=CUT_EXTRUDE11_2_DEPTH)

    # Fillet1
    # the kernel refuses this fillet: 4 mm, written as the material it takes off along each edge
    with BuildSketch(Plane(origin=(31.495324698, 26.12877101, 142.775691762), x_dir=(-1, 0, 0), z_dir=(0, -1, 0))) as fillet1_piece_1:
        with BuildLine():
            CenterArc((FILLET1_R, -FILLET1_R), FILLET1_R, 90, 90)
            Line((0, -FILLET1_R), (0, 0))
            Line((0, 0), (FILLET1_R, 0))
        make_face()
    extrude(amount=52.35, mode=Mode.SUBTRACT)
    with BuildSketch(Plane(origin=(31.495324698, -20.12122899, 142.775691762), x_dir=(-1.0, 1.999369252409243e-11, 0), z_dir=(-1.999369252409243e-11, -1.0, 0))) as fillet1_piece_2:
        with BuildLine():
            CenterArc((FILLET1_R, -FILLET1_R), FILLET1_R, 90, 90)
            Line((0, -FILLET1_R), (0, 0))
            Line((0, 0), (FILLET1_R, 0))
        make_face()
    extrude(amount=10.373056111, mode=Mode.SUBTRACT)
    with BuildSketch(Plane(origin=(31.495324698, -9.92122899, 142.775691762), x_dir=(-1, 0, 0), z_dir=(0, -1, 0))) as fillet1_piece_3:
        with BuildLine():
            CenterArc((FILLET1_R, -FILLET1_R), FILLET1_R, 90, 90)
            Line((0, -FILLET1_R), (0, 0))
            Line((0, 0), (FILLET1_R, 0))
        make_face()
    extrude(amount=10.2, mode=Mode.SUBTRACT)

    # Fillet2
    fillet2_edges = [part.edges().sort_by_distance(p)[0] for p in [
        (25.728428711, -26.381755194, 144.025691762),
    ]]
    fillet(fillet2_edges, radius=FILLET2_R)

    # Sketch11<4> → Boss-Extrude8 (add)
    with BuildSketch(Plane(origin=(0, 0, 142.775691762), x_dir=(-1, 0, 0), z_dir=(0, 0, -1)).offset(BOSS_EXTRUDE8_START)):
        with Locations((1.024675302, -14.873373874)):
            Rectangle(SKETCH11_4_W, SKETCH11_4_H)
        with Locations(Location((1.049675302, -16.313373874, 0), (0, 0, 90))):
            Circle(SKETCH11_4_R, mode=Mode.SUBTRACT)
    extrude(amount=BOSS_EXTRUDE8_DEPTH)


solid = part.part
